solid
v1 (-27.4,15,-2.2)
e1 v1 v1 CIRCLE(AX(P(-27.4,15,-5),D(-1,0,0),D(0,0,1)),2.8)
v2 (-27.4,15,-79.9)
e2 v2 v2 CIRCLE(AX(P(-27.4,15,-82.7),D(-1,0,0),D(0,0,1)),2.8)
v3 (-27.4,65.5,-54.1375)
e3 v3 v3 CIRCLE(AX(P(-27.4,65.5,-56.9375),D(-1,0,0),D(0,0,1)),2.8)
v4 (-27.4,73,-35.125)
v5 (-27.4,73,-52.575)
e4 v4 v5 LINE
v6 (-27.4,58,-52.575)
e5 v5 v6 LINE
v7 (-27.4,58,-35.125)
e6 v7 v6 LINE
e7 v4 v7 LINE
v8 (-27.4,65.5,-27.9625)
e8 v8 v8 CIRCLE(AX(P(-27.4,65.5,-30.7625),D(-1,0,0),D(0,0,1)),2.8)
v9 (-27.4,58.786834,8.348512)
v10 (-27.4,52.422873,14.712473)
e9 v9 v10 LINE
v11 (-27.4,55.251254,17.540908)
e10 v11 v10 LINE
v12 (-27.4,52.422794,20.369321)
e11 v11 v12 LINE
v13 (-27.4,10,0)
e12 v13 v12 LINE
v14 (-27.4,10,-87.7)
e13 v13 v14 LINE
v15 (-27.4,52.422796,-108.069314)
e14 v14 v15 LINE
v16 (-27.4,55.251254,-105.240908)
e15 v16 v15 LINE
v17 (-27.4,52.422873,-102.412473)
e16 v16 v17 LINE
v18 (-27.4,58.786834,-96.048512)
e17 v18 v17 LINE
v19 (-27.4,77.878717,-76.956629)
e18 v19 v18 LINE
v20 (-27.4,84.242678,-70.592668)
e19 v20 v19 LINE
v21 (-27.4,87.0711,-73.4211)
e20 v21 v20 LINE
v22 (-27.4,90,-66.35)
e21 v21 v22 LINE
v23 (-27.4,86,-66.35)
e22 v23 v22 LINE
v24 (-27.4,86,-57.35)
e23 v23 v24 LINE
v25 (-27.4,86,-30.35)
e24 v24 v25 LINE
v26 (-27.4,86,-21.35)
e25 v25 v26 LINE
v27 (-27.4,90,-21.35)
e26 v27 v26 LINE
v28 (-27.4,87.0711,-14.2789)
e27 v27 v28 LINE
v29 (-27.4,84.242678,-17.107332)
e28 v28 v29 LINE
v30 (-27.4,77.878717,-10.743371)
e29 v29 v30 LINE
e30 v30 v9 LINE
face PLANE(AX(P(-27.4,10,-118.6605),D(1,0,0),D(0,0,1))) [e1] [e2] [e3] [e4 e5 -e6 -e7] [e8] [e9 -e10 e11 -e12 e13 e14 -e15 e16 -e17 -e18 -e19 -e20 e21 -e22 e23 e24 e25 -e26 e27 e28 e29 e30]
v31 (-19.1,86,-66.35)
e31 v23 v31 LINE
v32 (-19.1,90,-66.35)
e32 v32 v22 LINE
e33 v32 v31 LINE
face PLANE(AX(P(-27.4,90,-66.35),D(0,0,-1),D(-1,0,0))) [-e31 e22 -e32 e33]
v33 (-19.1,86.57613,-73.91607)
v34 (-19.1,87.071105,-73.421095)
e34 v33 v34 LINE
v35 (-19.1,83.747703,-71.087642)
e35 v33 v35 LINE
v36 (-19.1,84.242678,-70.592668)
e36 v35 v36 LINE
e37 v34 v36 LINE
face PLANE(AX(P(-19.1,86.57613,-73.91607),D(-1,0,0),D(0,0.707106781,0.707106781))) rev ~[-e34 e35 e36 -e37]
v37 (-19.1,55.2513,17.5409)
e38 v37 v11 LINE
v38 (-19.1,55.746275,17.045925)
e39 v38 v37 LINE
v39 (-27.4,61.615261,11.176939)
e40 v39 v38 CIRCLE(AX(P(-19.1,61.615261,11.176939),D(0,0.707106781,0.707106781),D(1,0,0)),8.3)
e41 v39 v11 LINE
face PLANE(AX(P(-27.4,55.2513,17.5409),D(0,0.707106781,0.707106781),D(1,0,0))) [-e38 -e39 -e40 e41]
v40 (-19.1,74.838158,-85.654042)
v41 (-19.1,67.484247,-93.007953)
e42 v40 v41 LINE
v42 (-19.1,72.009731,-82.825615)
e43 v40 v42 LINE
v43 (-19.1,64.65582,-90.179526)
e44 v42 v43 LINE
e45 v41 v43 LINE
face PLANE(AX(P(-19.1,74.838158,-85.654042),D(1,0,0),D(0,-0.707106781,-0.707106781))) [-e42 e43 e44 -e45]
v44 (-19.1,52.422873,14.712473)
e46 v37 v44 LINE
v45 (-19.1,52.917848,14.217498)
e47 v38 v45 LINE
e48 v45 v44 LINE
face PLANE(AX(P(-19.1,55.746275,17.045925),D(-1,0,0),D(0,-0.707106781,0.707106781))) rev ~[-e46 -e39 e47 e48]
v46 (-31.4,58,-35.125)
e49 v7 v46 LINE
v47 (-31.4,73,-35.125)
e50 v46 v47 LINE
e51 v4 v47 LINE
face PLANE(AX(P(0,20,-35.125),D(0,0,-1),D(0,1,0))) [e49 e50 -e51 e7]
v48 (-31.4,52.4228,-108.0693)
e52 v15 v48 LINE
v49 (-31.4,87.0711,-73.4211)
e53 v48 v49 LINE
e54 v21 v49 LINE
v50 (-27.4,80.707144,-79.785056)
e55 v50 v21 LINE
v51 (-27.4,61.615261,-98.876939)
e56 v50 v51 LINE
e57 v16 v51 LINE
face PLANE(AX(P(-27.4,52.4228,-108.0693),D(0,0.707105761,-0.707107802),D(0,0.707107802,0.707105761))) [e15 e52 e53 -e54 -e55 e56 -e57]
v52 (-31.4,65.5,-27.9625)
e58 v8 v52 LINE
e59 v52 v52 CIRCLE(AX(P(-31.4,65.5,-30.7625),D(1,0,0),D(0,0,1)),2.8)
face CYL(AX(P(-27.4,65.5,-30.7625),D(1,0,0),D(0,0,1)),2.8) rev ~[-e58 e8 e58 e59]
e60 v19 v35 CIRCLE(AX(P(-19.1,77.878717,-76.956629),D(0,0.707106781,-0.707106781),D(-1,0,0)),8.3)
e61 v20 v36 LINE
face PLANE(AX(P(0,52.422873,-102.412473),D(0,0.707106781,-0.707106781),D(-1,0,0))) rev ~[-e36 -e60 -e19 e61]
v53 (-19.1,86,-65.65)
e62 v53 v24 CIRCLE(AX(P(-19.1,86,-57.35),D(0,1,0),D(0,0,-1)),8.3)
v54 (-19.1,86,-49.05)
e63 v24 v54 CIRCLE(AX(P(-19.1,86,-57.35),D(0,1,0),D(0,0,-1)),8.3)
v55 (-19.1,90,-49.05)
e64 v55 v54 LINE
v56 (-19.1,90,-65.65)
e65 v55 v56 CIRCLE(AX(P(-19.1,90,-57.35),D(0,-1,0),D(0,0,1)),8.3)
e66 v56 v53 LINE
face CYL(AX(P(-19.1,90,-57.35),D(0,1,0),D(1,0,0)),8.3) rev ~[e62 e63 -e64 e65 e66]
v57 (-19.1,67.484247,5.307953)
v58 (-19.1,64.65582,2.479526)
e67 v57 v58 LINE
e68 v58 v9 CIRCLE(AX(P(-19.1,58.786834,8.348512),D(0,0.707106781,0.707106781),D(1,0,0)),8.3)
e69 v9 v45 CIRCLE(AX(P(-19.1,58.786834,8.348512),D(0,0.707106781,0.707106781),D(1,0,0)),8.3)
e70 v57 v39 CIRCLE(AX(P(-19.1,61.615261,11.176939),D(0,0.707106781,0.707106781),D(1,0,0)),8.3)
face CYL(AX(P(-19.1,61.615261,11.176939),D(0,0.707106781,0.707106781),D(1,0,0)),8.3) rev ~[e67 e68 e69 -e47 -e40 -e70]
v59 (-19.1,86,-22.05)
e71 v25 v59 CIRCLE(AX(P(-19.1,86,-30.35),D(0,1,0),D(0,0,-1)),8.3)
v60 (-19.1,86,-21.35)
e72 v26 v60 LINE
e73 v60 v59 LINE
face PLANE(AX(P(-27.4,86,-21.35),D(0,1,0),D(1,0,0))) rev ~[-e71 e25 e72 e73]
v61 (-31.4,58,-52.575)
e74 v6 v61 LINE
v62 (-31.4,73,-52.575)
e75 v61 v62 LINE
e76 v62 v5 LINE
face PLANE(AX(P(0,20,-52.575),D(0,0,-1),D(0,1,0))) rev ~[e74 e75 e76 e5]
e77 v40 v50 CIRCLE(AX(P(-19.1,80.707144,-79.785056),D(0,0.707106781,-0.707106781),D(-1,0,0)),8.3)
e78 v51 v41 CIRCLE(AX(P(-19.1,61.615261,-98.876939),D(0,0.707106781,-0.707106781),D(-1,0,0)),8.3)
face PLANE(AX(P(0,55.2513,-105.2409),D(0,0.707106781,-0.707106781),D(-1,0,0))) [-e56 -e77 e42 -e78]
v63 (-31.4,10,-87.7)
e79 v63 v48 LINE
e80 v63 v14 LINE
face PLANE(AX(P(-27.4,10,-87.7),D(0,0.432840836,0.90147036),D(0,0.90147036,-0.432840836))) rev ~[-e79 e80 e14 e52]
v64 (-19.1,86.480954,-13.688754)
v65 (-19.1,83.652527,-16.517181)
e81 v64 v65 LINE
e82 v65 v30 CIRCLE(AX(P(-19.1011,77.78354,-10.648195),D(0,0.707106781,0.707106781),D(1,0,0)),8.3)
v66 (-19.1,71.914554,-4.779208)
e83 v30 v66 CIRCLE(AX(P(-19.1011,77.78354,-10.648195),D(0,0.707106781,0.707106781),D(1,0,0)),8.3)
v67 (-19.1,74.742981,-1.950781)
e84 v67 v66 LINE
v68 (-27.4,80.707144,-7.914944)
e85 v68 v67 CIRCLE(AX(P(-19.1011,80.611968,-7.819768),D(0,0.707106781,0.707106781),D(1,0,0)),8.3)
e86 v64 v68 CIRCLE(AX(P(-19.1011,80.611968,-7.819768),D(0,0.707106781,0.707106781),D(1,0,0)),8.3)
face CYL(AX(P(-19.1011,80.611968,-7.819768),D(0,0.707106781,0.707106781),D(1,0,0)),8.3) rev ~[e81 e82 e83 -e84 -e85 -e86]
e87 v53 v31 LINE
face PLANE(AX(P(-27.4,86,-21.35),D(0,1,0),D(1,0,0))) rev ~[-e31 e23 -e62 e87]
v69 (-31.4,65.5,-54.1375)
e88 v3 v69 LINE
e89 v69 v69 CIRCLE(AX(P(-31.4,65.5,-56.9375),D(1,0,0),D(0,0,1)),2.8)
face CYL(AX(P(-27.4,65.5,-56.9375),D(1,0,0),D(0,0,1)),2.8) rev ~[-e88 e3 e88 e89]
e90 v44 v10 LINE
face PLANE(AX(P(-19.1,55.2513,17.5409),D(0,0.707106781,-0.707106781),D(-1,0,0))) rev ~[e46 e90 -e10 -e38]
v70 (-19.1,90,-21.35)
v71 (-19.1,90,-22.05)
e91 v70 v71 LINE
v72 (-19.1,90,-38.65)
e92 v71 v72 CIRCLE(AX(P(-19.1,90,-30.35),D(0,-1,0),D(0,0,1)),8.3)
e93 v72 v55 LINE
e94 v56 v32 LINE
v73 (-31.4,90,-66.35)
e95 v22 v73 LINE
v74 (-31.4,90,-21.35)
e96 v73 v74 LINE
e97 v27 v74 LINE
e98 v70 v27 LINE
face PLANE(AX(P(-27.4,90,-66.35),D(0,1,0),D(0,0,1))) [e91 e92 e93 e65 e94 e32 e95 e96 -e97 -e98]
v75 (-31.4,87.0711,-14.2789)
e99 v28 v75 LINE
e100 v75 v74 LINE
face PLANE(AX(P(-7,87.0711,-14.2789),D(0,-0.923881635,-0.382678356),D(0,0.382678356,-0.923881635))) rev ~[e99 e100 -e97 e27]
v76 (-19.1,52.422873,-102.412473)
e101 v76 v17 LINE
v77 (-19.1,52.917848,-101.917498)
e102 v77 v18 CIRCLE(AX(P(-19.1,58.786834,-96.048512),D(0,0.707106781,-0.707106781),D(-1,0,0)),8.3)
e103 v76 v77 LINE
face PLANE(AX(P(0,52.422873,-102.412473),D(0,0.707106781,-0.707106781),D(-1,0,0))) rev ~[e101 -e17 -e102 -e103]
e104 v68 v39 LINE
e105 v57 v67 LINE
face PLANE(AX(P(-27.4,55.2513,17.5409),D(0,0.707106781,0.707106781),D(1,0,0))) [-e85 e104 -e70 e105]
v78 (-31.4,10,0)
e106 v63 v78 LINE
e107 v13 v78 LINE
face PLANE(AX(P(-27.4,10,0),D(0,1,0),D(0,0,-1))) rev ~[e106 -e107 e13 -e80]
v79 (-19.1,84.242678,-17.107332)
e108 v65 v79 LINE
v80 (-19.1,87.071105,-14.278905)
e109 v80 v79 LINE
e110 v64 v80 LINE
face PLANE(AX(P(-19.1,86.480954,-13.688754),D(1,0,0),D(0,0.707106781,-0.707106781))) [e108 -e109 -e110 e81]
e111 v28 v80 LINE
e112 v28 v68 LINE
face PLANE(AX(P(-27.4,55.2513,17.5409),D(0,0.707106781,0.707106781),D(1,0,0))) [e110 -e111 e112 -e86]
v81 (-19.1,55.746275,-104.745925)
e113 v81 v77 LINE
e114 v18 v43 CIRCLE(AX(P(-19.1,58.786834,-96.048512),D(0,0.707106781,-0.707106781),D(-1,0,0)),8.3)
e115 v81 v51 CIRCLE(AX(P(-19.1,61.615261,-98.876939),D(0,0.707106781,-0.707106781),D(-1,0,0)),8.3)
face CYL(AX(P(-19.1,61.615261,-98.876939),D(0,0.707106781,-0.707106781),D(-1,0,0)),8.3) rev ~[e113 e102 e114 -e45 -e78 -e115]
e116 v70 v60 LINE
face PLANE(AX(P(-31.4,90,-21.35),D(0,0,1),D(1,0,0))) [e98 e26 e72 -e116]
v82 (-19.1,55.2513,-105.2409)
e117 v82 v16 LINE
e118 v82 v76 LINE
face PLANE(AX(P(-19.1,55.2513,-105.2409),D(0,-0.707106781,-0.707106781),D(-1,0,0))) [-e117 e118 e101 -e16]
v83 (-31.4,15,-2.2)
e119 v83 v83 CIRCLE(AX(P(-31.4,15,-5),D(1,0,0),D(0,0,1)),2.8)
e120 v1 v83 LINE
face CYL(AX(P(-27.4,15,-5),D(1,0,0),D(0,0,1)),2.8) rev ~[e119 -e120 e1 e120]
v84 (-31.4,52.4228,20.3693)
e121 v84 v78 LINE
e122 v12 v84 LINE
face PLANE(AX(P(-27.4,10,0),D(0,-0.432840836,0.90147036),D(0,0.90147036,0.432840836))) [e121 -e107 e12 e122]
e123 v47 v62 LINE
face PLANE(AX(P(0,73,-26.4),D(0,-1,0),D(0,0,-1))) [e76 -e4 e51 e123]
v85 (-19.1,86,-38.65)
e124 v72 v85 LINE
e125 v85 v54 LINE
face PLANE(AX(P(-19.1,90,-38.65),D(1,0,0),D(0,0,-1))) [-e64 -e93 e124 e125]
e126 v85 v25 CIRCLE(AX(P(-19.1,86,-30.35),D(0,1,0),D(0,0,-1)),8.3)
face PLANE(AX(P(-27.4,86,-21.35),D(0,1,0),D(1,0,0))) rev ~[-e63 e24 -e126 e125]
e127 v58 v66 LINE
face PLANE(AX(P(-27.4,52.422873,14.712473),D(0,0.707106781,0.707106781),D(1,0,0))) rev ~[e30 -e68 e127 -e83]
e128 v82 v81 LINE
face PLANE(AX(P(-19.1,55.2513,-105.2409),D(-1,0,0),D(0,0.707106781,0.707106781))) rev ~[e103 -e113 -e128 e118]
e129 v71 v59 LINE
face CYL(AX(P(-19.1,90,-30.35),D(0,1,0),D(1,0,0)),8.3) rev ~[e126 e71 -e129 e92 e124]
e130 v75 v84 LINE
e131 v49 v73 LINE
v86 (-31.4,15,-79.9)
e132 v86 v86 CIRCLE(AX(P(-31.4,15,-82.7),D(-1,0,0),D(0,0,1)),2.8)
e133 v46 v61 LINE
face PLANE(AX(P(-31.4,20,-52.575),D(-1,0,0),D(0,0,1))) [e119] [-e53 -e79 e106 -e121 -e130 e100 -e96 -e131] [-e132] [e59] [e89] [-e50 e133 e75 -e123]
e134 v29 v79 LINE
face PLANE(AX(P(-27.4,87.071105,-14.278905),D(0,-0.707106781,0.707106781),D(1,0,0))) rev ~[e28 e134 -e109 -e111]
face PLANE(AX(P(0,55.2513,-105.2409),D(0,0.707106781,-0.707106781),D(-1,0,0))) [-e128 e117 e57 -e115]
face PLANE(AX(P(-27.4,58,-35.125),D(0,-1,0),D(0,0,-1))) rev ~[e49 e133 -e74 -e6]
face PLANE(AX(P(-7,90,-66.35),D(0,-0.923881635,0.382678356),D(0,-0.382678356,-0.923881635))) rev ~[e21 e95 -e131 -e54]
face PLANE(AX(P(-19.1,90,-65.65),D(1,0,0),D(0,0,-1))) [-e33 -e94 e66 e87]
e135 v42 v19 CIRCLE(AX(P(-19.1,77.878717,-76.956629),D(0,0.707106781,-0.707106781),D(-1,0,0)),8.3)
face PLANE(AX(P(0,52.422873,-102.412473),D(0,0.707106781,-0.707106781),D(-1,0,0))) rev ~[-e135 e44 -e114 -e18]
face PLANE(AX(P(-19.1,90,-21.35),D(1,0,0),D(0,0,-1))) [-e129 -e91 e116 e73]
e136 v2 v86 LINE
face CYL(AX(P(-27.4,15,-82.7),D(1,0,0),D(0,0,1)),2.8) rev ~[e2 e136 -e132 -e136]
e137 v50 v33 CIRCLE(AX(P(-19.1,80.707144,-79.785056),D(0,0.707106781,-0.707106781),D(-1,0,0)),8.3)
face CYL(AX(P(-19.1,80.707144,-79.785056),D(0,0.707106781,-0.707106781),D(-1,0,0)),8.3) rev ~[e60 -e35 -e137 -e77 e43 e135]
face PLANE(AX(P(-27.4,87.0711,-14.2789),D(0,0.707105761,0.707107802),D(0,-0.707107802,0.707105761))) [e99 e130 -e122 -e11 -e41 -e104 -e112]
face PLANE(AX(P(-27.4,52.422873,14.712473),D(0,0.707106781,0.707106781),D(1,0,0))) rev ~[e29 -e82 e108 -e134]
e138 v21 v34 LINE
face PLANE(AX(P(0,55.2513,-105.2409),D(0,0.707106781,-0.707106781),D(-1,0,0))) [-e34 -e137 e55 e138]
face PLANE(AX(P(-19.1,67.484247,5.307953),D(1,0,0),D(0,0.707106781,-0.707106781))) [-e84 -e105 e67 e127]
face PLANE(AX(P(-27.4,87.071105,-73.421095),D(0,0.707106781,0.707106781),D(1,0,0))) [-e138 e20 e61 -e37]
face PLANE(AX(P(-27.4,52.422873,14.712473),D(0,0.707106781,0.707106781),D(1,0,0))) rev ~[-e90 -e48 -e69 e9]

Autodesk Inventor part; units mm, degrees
ref_plane "YZ Plane" through (0, 0, 0) normal (1, 0, 0) x (0, 1, 0)
ref_plane "XZ Plane" through (0, 0, 0) normal (0, 1, 0) x (-1, 0, 0)
ref_plane "XY Plane" through (0, 0, 0) normal (0, 0, 1) x (1, 0, 0)
sketch "Sketch1" plane through (0, 0, 0) normal (0, 1, 0) x (-1, 0, 0)
  line L0 (0, 0) -> (27.4, 0)
  line L1 (27.4, 0) -> (27.4, -87.7)
  line L2 (27.4, -87.7) -> (0, -87.7)
  line L3 (0, -87.7) -> (0, 0)
  line L4 (13.7, 0) -> (13.7, -13.2)
  line L5 (13.7, -87.7) -> (13.7, -74.5)
  circle A0 centre (13.7, -13.2) radius 2
  circle A1 centre (13.7, -74.5) radius 2
  dimension "d0" = 27.4
  dimension "d1" = 87.7
  dimension "d2" = 13.2
  dimension "d4" = 4
  dimension "d6" = 4
extrude "Extrusion1" add sketch "Sketch1" along normal blind 10
sketch "Sketch2" plane through (0, 0, 0) normal (0, -1, 0) x (1, 0, 0)
  circle A0 centre (-13.7, -13.2) radius 2 projected
  circle A1 centre (-13.7, -13.2) radius 4.5
  circle A2 centre (-13.7, -74.5) radius 2 projected
  circle A3 centre (-13.7, -74.5) radius 4.5
  point P0 (0, 0)
  dimension "d9" = 9
  dimension "d10" = 9
extrude "Extrusion2" cut sketch "Sketch2" against normal blind 3
sketch "Sketch3" plane through (0, 10, 0) normal (0, 1, 0) x (1, 0, 0)
  line L0 (0, 0) -> (0, 87.7) projected
  line L1 (0, 87.7) -> (-27.4, 87.7) projected
  line L2 (0, 0) -> (-27.4, 0)
  line L3 (-27.4, 0) -> (-27.4, 87.7)
  line L4 (-27.4, 87.7) -> (0, 87.7)
  line L5 (0, 87.7) -> (0, 0)
  circle A0 centre (-11.7, 12.5929) radius 0.0901
  circle A1 centre (-13.7, 13.2) radius 2 projected
sketch "Sketch4" plane through (0, 0, 0) normal (0, -1, 0) x (1, 0, 0)
  line L0 (-27.4, -87.7) -> (-27.4, 0) projected
  line L1 (-27.4, -43.85) -> (0, -43.85)
  line L2 (0, 0) -> (0, -87.7) projected
  circle A0 centre (-13.7, -13.2) radius 2 projected
  line L3 (-13.7, -13.2) -> (-13.7, -26.4)
  line L4 (-13.7, -26.4) -> (0, -26.4)
  line L5 (0, -26.4) -> (0, -43.85)
  line L6 (0, -43.85) -> (-13.7, -43.85)
  line L7 (-13.7, -43.85) -> (-13.7, -26.4)
  line L8 (-13.7, -26.4) -> (-27.4, -26.4)
  line L9 (-27.4, -26.4) -> (-27.4, -43.85)
  line L10 (-27.4, -43.85) -> (-13.7, -43.85)
  line L11 (-13.7, -43.85) -> (-13.7, -26.4)
  circle A1 centre (-13.7, -74.5) radius 2 projected
  line L12 (-13.7, -74.5) -> (-13.7, -61.3)
  line L13 (-13.7, -43.85) -> (-13.7, -61.3)
  line L14 (-13.7, -61.3) -> (0, -61.3)
  line L15 (0, -61.3) -> (0, -43.85)
  line L16 (0, -43.85) -> (-13.7, -43.85)
  line L17 (-13.7, -43.85) -> (-13.7, -61.3)
  line L18 (-13.7, -43.85) -> (-27.4, -43.85)
  line L19 (-27.4, -43.85) -> (-27.4, -61.3)
  line L20 (-27.4, -61.3) -> (-13.7, -61.3)
  line L21 (-13.7, -61.3) -> (-13.7, -43.85)
  line L22 (0, -26.4) -> (-27.4, -26.4)
  line L23 (-27.4, -26.4) -> (-27.4, -35.125)
  line L24 (-27.4, -35.125) -> (0, -35.125)
  line L25 (0, -35.125) -> (0, -26.4)
  line L26 (-27.4, -61.3) -> (0, -61.3)
  line L27 (0, -61.3) -> (0, -52.575)
  line L28 (0, -52.575) -> (-27.4, -52.575)
  line L29 (-27.4, -52.575) -> (-27.4, -61.3)
  dimension "d13" = 13.2
  dimension "d14" = 13.2
extrude "Extrusion3" add sketch "Sketch4" along normal blind 60 contours L0 L28 L13 L20 | L13 L28 L2 L14 | L0 L8 L7 L24 | L7 L4 L2 L24
sketch "Sketch5" plane through (0, 0, -87.7) normal (1, 0, 0) x (0, 0, -1)
  line L0 (0, 10) -> (-87.7, 10) projected
  line L1 (-87.7, 10) -> (-87.7, 182)
  line L2 (0, 10) -> (-87.7, 10)
  line L3 (-87.7, 10) -> (-87.7, 182)
  line L4 (-87.7, 182) -> (0, 182)
  line L5 (0, 182) -> (0, 10)
  line L6 (-87.7, 182) -> (0, 182)
  line L7 (0, 182) -> (0, 192)
  line L8 (0, 192) -> (-87.7, 192)
  line L9 (-87.7, 192) -> (-87.7, 182)
  line L10 (-61.3, 0) -> (-61.3, -60) projected
  line L11 (-61.3, -60) -> (-61.3, 192)
  line L12 (-26.4, -60) -> (-35.125, -60) projected
  line L13 (-26.4, -60) -> (-26.4, 192)
  line L14 (-52.575, 0) -> (-52.575, -60) projected
  line L15 (-52.575, -60) -> (-61.3, -60)
  line L16 (-61.3, -60) -> (-61.3, 192)
  line L17 (-61.3, 192) -> (-52.575, 192)
  line L18 (-52.575, 192) -> (-52.575, -60)
  line L19 (-26.4, 182) -> (-35.125, 182)
  line L20 (-35.125, 182) -> (-35.125, 192)
  line L21 (-35.125, 192) -> (-26.4, 192)
  line L22 (-26.4, 192) -> (-26.4, 182)
  line L23 (-61.3, 192) -> (-52.575, 192)
  line L24 (-52.575, 192) -> (-52.575, 252)
  line L25 (-52.575, 252) -> (-61.3, 252)
  line L26 (-61.3, 252) -> (-61.3, 192)
  line L27 (-35.125, 192) -> (-26.4, 192)
  line L28 (-26.4, 192) -> (-26.4, 252)
  line L29 (-26.4, 252) -> (-35.125, 252)
  line L30 (-35.125, 252) -> (-35.125, 192)
  line L31 (-26.4, 10) -> (-35.125, 10)
  line L32 (-35.125, 10) -> (-35.125, 192)
  line L33 (-35.125, 192) -> (-26.4, 192)
  line L34 (-26.4, 192) -> (-26.4, 10)
  point P0 (-87.7, 0)
  point P1 (-52.575, 10)
  point P2 (-52.575, 182)
  point P3 (-35.125, 10)
  point P4 (-26.4, 182)
  point P5 (-61.3, 182)
  point P6 (-61.3, 10)
  dimension "d17" = 172
  dimension "d18" = 10
  dimension "d19" = 8.725
  dimension "d20" = 60
  dimension "d21" = 60
extrude "Extrusion4" add sketch "Sketch5" against normal up to surface (27.4 mm away) contours L0 L32 L4 L13 | L4 L13 L8 L7 | L4 L20 L8 L13 | L0 L11 L4 L18 | L4 L18 L8 L20 | L4 L11 L8 L18 | L4 L9 L8 L11
extrude "Extrusion5" add sketch "Sketch5" against normal up to surface (27.4 mm away) contours L8 L30 L29 L28 | L8 L26 L25 L24
sketch "Sketch6" plane through (0, 0, 0) normal (0, -1, 0) x (1, 0, 0)
  circle A0 centre (-13.7, -13.2) radius 4.5 projected
  circle A1 centre (-13.7, -13.2) radius 2
  circle A2 centre (-13.7, -74.5) radius 2 projected
  circle A3 centre (-13.7, -74.5) radius 2
  point P0 (0, 0)
  dimension "d26" = 4
extrude "Extrusion6" add sketch "Sketch6" against normal through all contours A1 | A2
sketch "Sketch7" plane through (-13.7, 0, -74.5) normal (0, -1, 0) x (1, 0, 0)
  circle A0 centre (0, 61.3) radius 2 projected
  circle A1 centre (0, 61.3) radius 2
  circle A2 centre (0, 0) radius 4.5 projected
  circle A3 centre (0, 0) radius 2
  point P0 (13.7, 74.5)
extrude "Extrusion7" cut sketch "Sketch7" against normal through all contours A0 | A3
sketch "Sketch8" plane through (-27.4, 192, 0) normal (0, 1, 0) x (1, 0, 0)
  circle A0 centre (13.7, 13.2) radius 2 projected
  circle A1 centre (13.7, 13.2) radius 4.5
  circle A2 centre (13.7, 74.5) radius 4.5 projected
  circle A3 centre (13.7, 74.5) radius 4.5
  point P0 (27.4, 0)
  dimension "d31" = 9
  dimension "d32" = 9
extrude "Extrusion8" cut sketch "Sketch8" against normal blind 3
sketch "Sketch9" plane through (0, 0, 0) normal (1, 0, 0) x (0, 0, -1)
  line L0 (26.4, 182) -> (26.4, 10) projected
  line L1 (26.4, 10) -> (61.3, 10)
  line L2 (61.3, 10) -> (61.3, 182)
  line L3 (61.3, 182) -> (26.4, 182)
  line L4 (26.4, 182) -> (26.4, 10)
  point P0 (0, 0)
extrude "Extrusion9" cut sketch "Sketch9" against normal through all
sketch "Sketch10" plane through (0, 0, 0) normal (1, 0, 0) x (0, 0, -1)
  line L0 (-41.6694, 140.0326) -> (109.1096, 140.0326)
  line L1 (109.1096, 140.0326) -> (109.1096, 292.3119)
  line L2 (109.1096, 292.3119) -> (-41.6694, 292.3119)
  line L3 (-41.6694, 292.3119) -> (-41.6694, 140.0326)
  point P0 (0, 0)
extrude "Extrusion10" cut sketch "Sketch10" against normal blind 30
sketch "Sketch11" plane through (0, 10, 0) normal (0, 1, 0) x (1, 0, 0)
  line L0 (0, 61.3) -> (0, 87.7) projected
  line L1 (-27.4, 0) -> (0, 0) projected
  line L2 (0, 87.7) -> (-27.4, 87.7)
  line L3 (-27.4, 87.7) -> (-27.4, 0)
  line L4 (-27.4, 0) -> (0, 0)
  line L5 (0, 0) -> (0, 87.7)
extrude "Extrusion11" add sketch "Sketch11" against normal up to surface (10 mm away)
sketch "Sketch12" plane through (0, 10, 0) normal (0, 1, 0) x (1, 0, 0)
  line L0 (0, 61.3) -> (0, 87.7) projected
  line L1 (-27.4, 0) -> (0, 0) projected
  line L2 (0, 87.7) -> (-27.4, 87.7)
  line L3 (-27.4, 87.7) -> (-27.4, 0)
  line L4 (-27.4, 0) -> (0, 0)
  line L5 (0, 0) -> (0, 87.7)
  line L6 (-27.4, 0) -> (-11.2, 0)
  line L7 (0, 87.7) -> (-27.4, 87.7) projected
  line L8 (-27.4, 87.7) -> (-11.2, 87.7)
  line L9 (-11.2, 87.7) -> (-11.2, 74.5)
  line L10 (-11.2, 0) -> (-11.2, 13.2)
  circle A0 centre (-11.2, 74.5) radius 2
  circle A1 centre (-11.2, 13.2) radius 2
  dimension "d41" = 16.2
  dimension "d42" = 16.2
  dimension "d43" = 13.2
  dimension "d44" = 13.2
  dimension "d45" = 4
  dimension "d46" = 4
extrude "Extrusion12" cut sketch "Sketch12" against normal through all contours A0 | A1
sketch "Sketch13" plane through (0, 0, -87.7) normal (1, 0, 0) x (0, 0, -1)
  line L0 (-87.7, 10) -> (0, 10) projected
  line L1 (0, 10) -> (-87.7, 10)
  line L2 (-26.4, 0) -> (-26.4, -60) projected
  line L3 (-35.125, 0) -> (-35.125, -60) projected
  line L4 (-26.4, -60) -> (-35.125, -60)
  line L5 (-35.125, -60) -> (-35.125, 0)
  line L6 (-35.125, 0) -> (-26.4, 0)
  line L7 (-26.4, 0) -> (-26.4, -60)
  line L8 (-52.575, 0) -> (-52.575, -60) projected
  line L9 (-61.3, 0) -> (-61.3, -60) projected
  line L10 (-52.575, -60) -> (-61.3, -60)
  line L11 (-61.3, -60) -> (-61.3, 0)
  line L12 (-61.3, 0) -> (-52.575, 0)
  line L13 (-52.575, 0) -> (-52.575, -60)
  line L14 (0, 0) -> (-87.7, 0)
  line L15 (-87.7, 0) -> (-87.7, 10)
  line L16 (-87.7, 10) -> (0, 10)
  line L17 (0, 10) -> (0, 0)
  line L18 (-26.4, 20) -> (-26.4, 80)
  line L19 (-35.125, 20) -> (-35.125, 80)
  line L20 (-26.4, 80) -> (-35.125, 80)
  line L21 (-61.3, 20) -> (-61.3, 80)
  line L22 (-52.575, 80) -> (-61.3, 80)
  line L23 (-52.575, 20) -> (-52.575, 80)
  line L24 (0, 20) -> (-87.7, 20)
  line L25 (-87.7, 20) -> (-87.7, 10)
  line L26 (0, 10) -> (0, 20)
extrude "Extrusion13" add sketch "Sketch13" against normal up to surface (27.4 mm away) contours L25 L24 L26 L0 | L21 L22 L23 L24 | L24 L19 L20 L18
sketch "Sketch14" plane through (-27.4, 0, -26.4) normal (-1, 0, 0) x (0, 0, 1)
  line L0 (26.4, 0) -> (26.4, 20) projected
  line L1 (26.4, 10) -> (-64.4539, 10)
  line L2 (-64.4539, 10) -> (-64.4539, -69.7314)
  line L3 (-64.4539, -69.7314) -> (26.4, -69.7314)
  line L4 (26.4, -69.7314) -> (26.4, 10)
extrude "Extrusion14" cut sketch "Sketch14" against normal blind 30
sketch "Sketch15" plane through (0, 20, -61.3) normal (0, 1, 0) x (1, 0, 0)
  line L0 (0, 26.4) -> (0, 0) projected
  line L1 (0, 26.4) -> (0, 13.2)
  line L2 (0, 13.2) -> (-16.2, 13.2)
  line L3 (0, -61.3) -> (0, -48.1)
  line L4 (0, -34.9) -> (0, -61.3) projected
  line L5 (0, -48.1) -> (-16.2, -48.1)
  circle A0 centre (-16.2, 13.2) radius 2
  circle A1 centre (-16.2, -48.1) radius 2
  dimension "d53" = 13.2
  dimension "d54" = 16.2
  dimension "d55" = 13.2
  dimension "d56" = 16.2
  dimension "d57" = 4
  dimension "d58" = 4
extrude "Extrusion15" cut sketch "Sketch15" against normal blind 30
sketch "Sketch17" plane through (0, 20, -61.3) normal (1, 0, 0) x (0, 0, -1)
  line L0 (-61.3, -10) -> (-61.3, 0) projected
  line L1 (-61.3, -10) -> (-61.3, 179.5615)
  line L2 (-26.175, 60) -> (-34.9, 60) projected
  line L3 (0, 60) -> (-8.725, 60) projected
  line L4 (-26.175, 60) -> (-8.725, 60)
  line L5 (-17.45, 60) -> (-39.95, 60)
  line L6 (-17.45, 60) -> (5.05, 60)
  line L7 (0, 0) -> (0, 60) projected
  line L8 (-34.9, 60) -> (-34.9, 0) projected
  line L9 (0, 60) -> (-34.9, 60)
  line L10 (-34.9, 60) -> (-34.9, 53)
  line L11 (-34.9, 53) -> (0, 53)
  line L12 (0, 53) -> (0, 60)
  line L13 (5.05, 60) -> (-12.9933, 60)
  line L14 (-12.9933, 60) -> (-12.9933, 53)
  line L15 (-12.9933, 53) -> (5.05, 53)
  line L16 (5.05, 53) -> (5.05, 60)
  line L17 (-39.95, 60) -> (-34.9, 60)
  line L18 (-34.9, 60) -> (-34.9, 53)
  line L19 (-34.9, 53) -> (-39.95, 53)
  line L20 (-39.95, 53) -> (-39.95, 60)
  point P0 (-61.3, -20)
  dimension "d61" = 22.5
  dimension "d62" = 22.5
  dimension "d63" = 7
extrude "Extrusion16" add sketch "Sketch17" against normal up to surface (27.4 mm away) contours L4 L14 L11 L8 L2 | L4 L3 L7 L11 L14
extrude "Extrusion17" add sketch "Sketch17" against normal up to surface (27.4 mm away) contours L8 L19 L20 L5 | L7 L6 L16 L15
sketch "Sketch18" plane through (-27.4, 10, -87.7) normal (-1, 0, 0) x (0, 0, 1)
  line L0 (21.35, 70) -> (66.35, 70) projected
  line L1 (66.35, 70) -> (98.1698, 38.1802)
  line L2 (66.35, 70) -> (111.35, 70) construction
  line L3 (21.35, 70) -> (-10.4698, 38.1802)
  line L4 (21.35, 70) -> (66.35, 70) construction
  line L5 (21.35, 70) -> (26.2997, 65.0503)
  line L6 (26.2997, 65.0503) -> (-5.5201, 33.2304)
  line L7 (-10.4698, 38.1802) -> (-5.5201, 33.2304)
  line L8 (43.85, 70) -> (43.85, 34.6614)
  line L9 (66.35, 70) -> (98.1698, 38.1802)
  line L10 (66.35, 70) -> (61.4003, 65.0503)
  line L11 (61.4003, 65.0503) -> (93.2201, 33.2304)
  line L12 (98.1698, 38.1802) -> (93.2201, 33.2304)
  line L13 (21.35, 63) -> (21.35, 70) projected
  line L14 (21.35, 70) -> (21.35, 63)
  line L15 (21.35, 63) -> (24.2495, 63)
  line L16 (66.35, 70) -> (66.35, 63) projected
  line L17 (66.35, 70) -> (66.35, 63)
  line L18 (66.35, 63) -> (63.4505, 63)
  point P0 (87.7, -10)
  dimension "d68" = 45
  dimension "d69" = 45
  dimension "d70" = 45
  dimension "d71" = 135
  dimension "d72" = 7
  dimension "d73" = 45
extrude "Extrusion18" add sketch "Sketch18" against normal up to surface (27.4 mm away) contours L1 L12 L11 L18 L16 | L13 L15 L6 L7 L3
sketch "Sketch20" plane through (0, 10, -87.7) normal (0, -1, 0) x (1, 0, 0)
  circle A0 centre (-16.2, 13.2) radius 2 projected
  circle A1 centre (-16.2, 13.2) radius 2
  circle A2 centre (-16.2, 74.5) radius 2 projected
  circle A3 centre (-16.2, 74.5) radius 2
  point P0 (0, 87.7)
extrude "Extrusion19" add sketch "Sketch20" against normal through all
extrude "Extrusion20" cut sketch "Sketch20" against normal through all
sketch "Sketch21" plane through (0, 20, 0) normal (0, 1, 0) x (1, 0, 0)
  circle A0 centre (-16.2, 13.2) radius 2 projected
  circle A1 centre (-16.2, 13.2) radius 5
  circle A2 centre (-16.2, 74.5) radius 2 projected
  circle A3 centre (-16.2, 74.5) radius 5
  point P0 (0, 0)
  dimension "d80" = 10
  dimension "d81" = 10
extrude "Extrusion21" add sketch "Sketch21" along normal blind 80 contours A0 | A1 | A3
sketch "Sketch22" plane through (-16.2, 100, -13.2) normal (0, 1, 0) x (1, 0, 0)
  line L0 (-14.7944, -28.3502) -> (23.9654, -28.3502)
  line L1 (23.9654, -28.3502) -> (23.9654, 88.2133)
  line L2 (23.9654, 88.2133) -> (-14.7944, 88.2133)
  line L3 (-14.7944, 88.2133) -> (-14.7944, -28.3502)
  circle A0 centre (0, 0) radius 5 projected
  circle A1 centre (0, 0) radius 5
  circle A2 centre (0, 61.3) radius 2 projected
  circle A3 centre (0, 61.3) radius 5
  point P0 (16.2, -13.2)
extrude "Extrusion22" cut sketch "Sketch22" against normal blind 80 contours A0 | A3
sketch "Sketch24" plane through (-27.4, 80, -21.35) normal (0, 0.7071068, 0.7071068) x (1, 0, 0)
  line L0 (0, -45) -> (27.4, -45) projected
  line L1 (27.4, 0) -> (0, 0) projected
  line L2 (27.4, -45) -> (0, -45)
  line L3 (0, -45) -> (0, 0)
  line L4 (0, 0) -> (27.4, 0)
  line L5 (27.4, 0) -> (27.4, -45)
  line L6 (0, 0) -> (0, -45)
  line L7 (0, -2.5809) -> (0, -64.5942) projected
  line L8 (0, -22.5) -> (0, -27.5)
  line L9 (0, -27.5) -> (0, -17.5)
  line L10 (0, -27.5) -> (3, -27.5)
  line L11 (3, -27.5) -> (3, -17.5)
  line L12 (3, -17.5) -> (0, -17.5)
  line L13 (0, -17.5) -> (0, -27.5)
  line L14 (0, -17.5) -> (3, -17.5)
  line L15 (3, -17.5) -> (3, -27.5)
  line L16 (3, -27.5) -> (0, -27.5)
  line L17 (0, -27.5) -> (0, -17.5)
  point P0 (27.4, -71.6653)
  dimension "d86" = 5
  dimension "d87" = 10
  dimension "d88" = 3
extrude "Extrusion23" cut sketch "Sketch24" against normal up to surface (7 mm away) contours L3 L12 L11 L10
sketch "Sketch25" plane through (0, 80, -21.35) normal (0, 1, 0) x (1, 0, 0)
  line L0 (-27.4, 13.775) -> (-27.4, 31.225) projected
  line L1 (-27.4, 22.5) -> (-24.4, 22.5)
  line L2 (-24.4, 22.5) -> (-24.4, 17.5)
  line L3 (-24.4, 17.5) -> (-27.4, 17.5)
  line L4 (-27.4, 17.5) -> (-27.4, 22.5)
  line L5 (-27.4, 17.5) -> (-24.4, 17.5)
  line L6 (-24.4, 17.5) -> (-24.4, 27.5)
  line L7 (-24.4, 27.5) -> (-27.4, 27.5)
  line L8 (-27.4, 27.5) -> (-27.4, 17.5)
  point P0 (0, -21.35)
  point P1 (-24.4, 22.5)
  point P2 (-27.4, 27.5)
  dimension "d91" = 3
  dimension "d92" = 5
  dimension "d93" = 10
extrude "Extrusion24" cut sketch "Sketch25" against normal blind 10
sketch "Sketch26" plane through (0, 48.1802, -98.1698) normal (0, 0.7071068, -0.7071068) x (-1, 0, 0)
  line L0 (0, 45) -> (27.4, 45) projected
  line L1 (27.4, 45) -> (27.4, 0)
  line L2 (27.4, -19.5942) -> (27.4, 42.4191) projected
  line L3 (0, 42.4191) -> (0, -19.5942) projected
  line L4 (27.4, 45) -> (0, 45)
  line L5 (0, 45) -> (0, 0)
  line L6 (0, 0) -> (27.4, 0)
  line L7 (27.4, 0) -> (27.4, 45)
  line L8 (27.4, 45) -> (27.4, 27.5)
  line L9 (27.4, 24.653) -> (27.4, 62.1297) projected
  line L10 (27.4, 27.5) -> (24.4, 27.5)
  line L11 (24.4, 27.5) -> (24.4, 17.5)
  line L12 (24.4, 17.5) -> (27.4, 17.5)
  line L13 (27.4, 17.5) -> (27.4, 27.5)
  point P0 (0, 35.348)
  dimension "d96" = 45
  dimension "d97" = 17.5
  dimension "d98" = 3
  dimension "d99" = 10
extrude "Extrusion25" cut sketch "Sketch26" against normal blind 10 contours L1 L12 L11 L10
sketch "Sketch27" plane through (-27.4, 48.1802, 10.4698) normal (0, 0.7071068, 0.7071068) x (1, 0, 0)
  line L0 (0, 0) -> (27.4, 0) projected
  line L1 (27.4, 45) -> (0, 45) projected
  line L2 (27.4, 0) -> (20.4, 0)
  line L3 (20.4, 0) -> (20.4, 45)
  line L4 (20.4, 45) -> (27.4, 45)
  line L5 (27.4, 45) -> (27.4, 0)
  point P0 (27.4, -26.6653)
  dimension "d102" = 7
extrude "Extrusion26" add sketch "Sketch27" along normal blind 10
sketch "Sketch28" plane through (-27.4, 80, -66.35) normal (0, 1, 0) x (1, 0, 0)
  line L0 (27.4, -45) -> (20.4, -45) projected
  line L1 (27.4, 0) -> (27.4, -45) projected
  line L2 (20.4, -45) -> (27.4, -45)
  line L3 (27.4, -45) -> (27.4, 0)
  line L4 (27.4, 0) -> (20.4, 0)
  line L5 (20.4, 0) -> (20.4, -45)
  point P0 (27.4, -66.35)
extrude "Extrusion27" add sketch "Sketch28" along normal blind 10
sketch "Sketch29" plane through (0, 48.1802, -98.1698) normal (0, 0.7071068, -0.7071068) x (-1, 0, 0)
  line L0 (0, 45) -> (7, 45) projected
  line L1 (7, 45) -> (0, 45)
  line L2 (0, 45) -> (0, 0)
  line L3 (0, 0) -> (7, 0)
  line L4 (7, 0) -> (7, 45)
  point P0 (0, 35.348)
extrude "Extrusion28" add sketch "Sketch29" along normal blind 10
sketch "Sketch30" plane through (-7, 55.2513, 17.5409) normal (-1, 0, 0) x (0, 0.7071068, 0.7071068)
  line L0 (-10, 45) -> (0, 45) projected
  line L1 (-5, 45) -> (-6.4645, 48.5355)
  line L2 (-10, 45) -> (-2.9289, 52.0711) projected
  line L3 (0, 45) -> (-2.9289, 52.0711)
  line L4 (-2.9289, 52.0711) -> (-34.7487, 83.8909) projected
  line L5 (-34.7487, 83.8909) -> (-41.8198, 76.8198)
  line L6 (-41.8198, 76.8198) -> (-41.8198, 86.8198)
  line L7 (-41.8198, 86.8198) -> (-34.7487, 83.8909)
  point P0 (-51.4718, -26.6653)
extrude "Extrusion29" add sketch "Sketch30" against normal up to surface (7 mm away)
sketch "Sketch31" plane through (-7, 80, -66.35) normal (-1, 0, 0) x (0, 0, 1)
  line L0 (52.0711, 7.0711) -> (83.8909, -24.7487) projected
  line L1 (57.3744, -12.3744) -> (45, 0) projected
  line L2 (52.0711, 7.0711) -> (45, 0)
  line L3 (52.0711, 7.0711) -> (45, 10) projected
  line L4 (45, 0) -> (45, 10)
  line L5 (45, 10) -> (52.0711, 7.0711)
  line L6 (0, 10) -> (-7.0711, 7.0711) projected
  line L7 (-7.0711, 7.0711) -> (0, 10)
  line L8 (0, 0) -> (-12.3744, -12.3744) projected
  line L9 (0, 10) -> (0, 0)
  line L10 (0, 0) -> (-7.0711, 7.0711)
  point P0 (66.35, -80)
extrude "Extrusion30" add sketch "Sketch31" along normal up to surface (20.4 mm away)
sketch "Sketch32" plane through (-27.4, 43.2304, 5.5201) normal (0, -0.7071068, 0.7071068) x (1, 0, 0)
  line L0 (27.4, 0) -> (0, 0) projected
  line L1 (27.4, 17) -> (20.4, 17) projected
  line L2 (0, 0) -> (27.4, 0)
  line L3 (27.4, 0) -> (27.4, 17)
  line L4 (27.4, 17) -> (0, 17)
  line L5 (0, 17) -> (0, 0)
  point P0 (27.4, -34.4718)
  point P1 (20.4, 17)
extrude "Extrusion31" add sketch "Sketch32" along normal blind 4
sketch "Sketch33" plane through (0, 43.2304, -93.2201) normal (0, -0.7071068, -0.7071068) x (-1, 0, 0)
  line L0 (0, 14.0711) -> (0, 17) projected
  line L1 (27.4, 7) -> (27.4, -5.3744) projected
  line L2 (0, 17) -> (27.4, 17)
  line L3 (27.4, 17) -> (27.4, 0)
  line L4 (27.4, 0) -> (0, 0)
  line L5 (0, 0) -> (0, 17)
  point P0 (0, -96.4851)
  point P1 (0, 14.0711)
  dimension "d115" = 17
extrude "Extrusion32" add sketch "Sketch33" along normal blind 4
sketch "Sketch34" plane through (-27.4, 10, -87.7) normal (-1, 0, 0) x (0, 0, 1)
  line L0 (87.7, 0) -> (87.7, 10) projected
  line L1 (73.4211, 77.0711) -> (108.0693, 42.4228) projected
  line L2 (87.7, 0) -> (108.0693, 42.4228)
  line L3 (0, 0) -> (0, 10) projected
  line L4 (-17.5409, 45.2513) -> (-20.3693, 42.4228) projected
  line L5 (0, 0) -> (-20.3693, 42.4228)
  line L6 (108.0693, 42.4228) -> (73.4211, 77.0711)
  line L7 (73.4211, 77.0711) -> (66.35, 80) projected
  line L8 (73.4211, 77.0711) -> (66.35, 80)
  line L9 (66.35, 80) -> (21.35, 80) projected
  line L10 (66.35, 80) -> (21.35, 80)
  line L11 (21.35, 80) -> (14.2789, 77.0711) projected
  line L12 (21.35, 80) -> (14.2789, 77.0711)
  line L13 (14.2789, 77.0711) -> (-20.3693, 42.4228)
  line L14 (108.0693, 42.4228) -> (96.0485, 30.402)
  line L15 (61.3, 10) -> (87.7, 10) projected
  line L16 (108.0693, 42.4228) -> (153.9221, 42.4228) construction
  line L17 (63.4505, 63) -> (96.0485, 30.402) projected
  line L18 (65.0399, 10) -> (75.6465, 10)
  line L19 (-20.3693, 42.4228) -> (12.0535, 10)
  line L20 (-20.3693, 42.4228) -> (25.4835, 42.4228) construction
  line L21 (-8.3485, 30.402) -> (-3.0452, 35.7053)
  line L22 (-3.0452, 35.7053) -> (22.6601, 10)
  line L23 (22.6601, 10) -> (12.0535, 10)
  line L24 (96.0485, 30.402) -> (87.7, 10)
  line L25 (87.7, 10) -> (80.2, 10)
  line L26 (80.2, 10) -> (93.788, 43.2062)
  line L27 (96.0485, 30.402) -> (90.7263, 35.7242)
  line L28 (35.125, 10) -> (52.575, 10) projected
  line L29 (43.85, 10) -> (43.85, 63)
  line L30 (48.85, 63) -> (38.85, 63) projected
  line L31 (-8.3485, 30.402) -> (0, 10)
  line L32 (0, 10) -> (7.5, 10)
  line L33 (7.5, 10) -> (-6.088, 43.2062)
  line L34 (-8.3485, 30.402) -> (-3.0263, 35.7242)
  line L35 (94.5362, 31.9143) -> (85.1191, 10)
  line L36 (96.0485, 30.402) -> (94.5362, 31.9143)
  line L37 (80.8457, 45.6048) -> (96.0485, 30.402) projected
  line L38 (26.4, 10) -> (0, 10)
  line L39 (-8.3485, 30.402) -> (0, 10)
  line L40 (-8.3485, 30.402) -> (-3.0263, 35.7242)
  line L41 (-6.8362, 31.9143) -> (2.5809, 10)
  point P0 (87.7, -10)
  point P1 (2.5809, 10)
  point P2 (-4.5571, 26.6106)
  point P3 (94.5362, 31.9143)
  point P4 (85.1191, 10)
  dimension "d121" = 45
  dimension "d122" = 7.5
  dimension "d123" = 7.5
  dimension "d124" = 1
extrude "Extrusion33" add sketch "Sketch34" against normal blind 10 contours L0 L24 L14 L2 | L15 L35 L17 L24 | L5 L19 L31 L3 | L31 L19 L41 L32
sketch "Sketch35" plane through (-27.4, 20, -52.575) normal (-1, 0, 0) x (0, 0, 1)
  line L0 (52.575, 0) -> (52.575, -10) projected
  line L1 (26.175, 0) -> (49.9941, 0) projected
  line L2 (52.575, -10) -> (42.575, -10)
  line L3 (42.575, -10) -> (42.575, 0)
  line L4 (42.575, 0) -> (52.575, 0)
  line L5 (52.575, 0) -> (52.575, -10)
  line L6 (72.9443, 32.4228) -> (52.575, -10) projected
  line L7 (52.575, -10) -> (42.575, 0)
  circle A0 centre (47.575, -5) radius 2.8
  line L8 (52.575, -10) -> (-35.125, -10) projected
  line L9 (8.725, -10) -> (8.725, 0)
  line L10 (0, 0) -> (17.45, 0) projected
  circle A1 centre (-30.125, -5) radius 2.8
  line L11 (17.45, 0) -> (17.45, 53) projected
  line L12 (26.175, 53) -> (26.175, 0) projected
  line L13 (17.45, 53) -> (26.175, 53)
  line L14 (26.175, 53) -> (26.175, 38)
  line L15 (26.175, 38) -> (17.45, 38)
  line L16 (17.45, 38) -> (17.45, 53)
  line L17 (-8.725, 53) -> (-10.8755, 53) projected
  line L18 (26.175, 38) -> (-8.725, 38)
  line L19 (-8.725, 38) -> (-8.725, 53)
  line L20 (-8.725, 53) -> (26.175, 53)
  line L21 (26.175, 53) -> (26.175, 38)
  line L22 (-8.725, 38) -> (0, 38)
  line L23 (0, 38) -> (0, 53)
  line L24 (0, 53) -> (-8.725, 53)
  line L25 (-8.725, 53) -> (-8.725, 38)
  line L26 (26.175, 38) -> (17.45, 53)
  line L27 (3.725, 53) -> (0, 53) projected
  line L28 (0, 53) -> (-8.725, 38)
  circle A2 centre (21.8125, 45.5) radius 2.8
  circle A3 centre (-4.3625, 45.5) radius 2.8
  line L29 (31.225, 60) -> (31.225, 70) projected
  line L30 (38.2961, 67.0711) -> (31.225, 70) projected
  line L31 (31.225, 70) -> (38.2961, 67.0711)
  line L32 (38.2961, 67.0711) -> (72.9443, 32.4228)
  line L33 (72.9443, 32.4228) -> (52.575, -10)
  line L34 (52.575, -10) -> (-35.125, -10)
  line L35 (-35.125, -10) -> (-55.4943, 32.4228) projected
  line L36 (-35.125, -10) -> (-55.4943, 32.4228)
  line L37 (-55.4943, 32.4228) -> (-20.8461, 67.0711)
  line L38 (-20.8461, 67.0711) -> (-13.775, 70)
  line L39 (-13.775, 70) -> (31.225, 70)
  point P0 (52.575, -20)
  point P1 (0, 38)
  dimension "d127" = 10
  dimension "d128" = 5.6
  dimension "d129" = 15
  dimension "d130" = 5.6
  dimension "d131" = 5.6
extrude "Extrusion34" add sketch "Sketch35" along normal blind 4 contours L4 L1 L12 L13 L20 L19 L18 L11 L10 L9 L8 L35 L37 L38 L39 L30 L32 L6 L0 | L0 L7 A0 L1 L4 | L2 L3 L7 A0 | L8 L9 L10 L11 L15 L12 L1 L3 | L26 A2 L13 L12 | L15 L11 L26 A2 | L18 L28 A3 L23 | L19 L20 L28 A3
sketch "Sketch36" plane through (0, 10, -87.7) normal (0, -1, 0) x (1, 0, 0)
  line L0 (0, 0) -> (-17.4, 0) projected
  line L1 (-17.4, 0) -> (-17.4, -25)
  line L2 (-17.4, -8.3485) -> (-17.4, -20.3693) projected
  line L3 (-17.4, -25) -> (-17.4, 119.772)
  line L4 (-17.4, 119.772) -> (7.6601, 119.772)
  line L5 (7.6601, 119.772) -> (7.6601, -47.6838)
  line L6 (7.6601, -47.6838) -> (-17.4, -47.6838)
  line L7 (-17.4, -47.6838) -> (-17.4, 119.772)
  line L8 (-31.4, 87.7) -> (-17.4, 87.7) projected
  line L9 (-31.4, 87.7) -> (-27.4, 87.7)
  line L10 (-27.4, 87.7) -> (4.1783, 87.7)
  line L11 (4.1783, 87.7) -> (4.1783, -30.9605)
  line L12 (4.1783, -30.9605) -> (-27.4, -30.9605)
  line L13 (-27.4, -30.9605) -> (-27.4, 87.7)
  line L14 (-27.4, -30.9605) -> (13.0906, -30.9605)
  line L15 (13.0906, -30.9605) -> (13.0906, 140.084)
  line L16 (13.0906, 140.084) -> (-27.4, 140.084)
  line L17 (-27.4, 140.084) -> (-27.4, -30.9605)
  point P0 (0, 87.7)
  point P1 (-17.4, -30.9605)
  point P2 (7.6601, -30.9605)
  dimension "d134" = 25
  dimension "d135" = 4
extrude "Extrusion35" cut sketch "Sketch36" against normal through all
sketch "Sketch37" plane through (-27.4, 90, -21.35) normal (0, 1, 0) x (1, 0, 0)
  line L0 (-4, 0) -> (-4, 45) projected
  line L1 (-4, 22.5) -> (-4, 0)
  line L2 (-4, 0) -> (-4, 45)
  line L3 (0, 66.35) -> (0, -21.35) projected
  line L4 (-4, 0) -> (0, 0)
  line L5 (0, 0) -> (0, 45)
  line L6 (0, 45) -> (-4, 45)
  line L7 (-4, 45) -> (-4, 0)
  line L8 (0, 45) -> (27.4, 45)
  line L9 (27.4, 45) -> (27.4, 0)
  line L10 (27.4, 0) -> (0, 0)
  line L11 (0, 0) -> (0, 45)
  line L12 (-4, 0) -> (8.3, 0)
  line L13 (0, 0) -> (0, 9)
  line L14 (8.3, 0) -> (8.3, 9)
  line L15 (8.3, 9) -> (-4, 9)
  line L16 (-4, 9) -> (-4, 0)
  line L17 (-4, 0) -> (8.3, 0)
  line L18 (8.3, 0) -> (8.3, 9)
  circle A0 centre (8.3, 9) radius 8.3
  line L19 (8.3, 9) -> (8.3, 45)
  line L20 (8.3, 45) -> (8.3, 36)
  circle A1 centre (8.3, 36) radius 8.3
  line L21 (8.3, 0) -> (0, 0)
  line L22 (0, 0) -> (0, 45)
  line L23 (0, 45) -> (8.3, 45)
  line L24 (8.3, 45) -> (8.3, 0)
  point P0 (27.4, -21.35)
  point P1 (8.3, 0.7)
  point P2 (8.3, 17.3)
  point P3 (8.3, 27.7)
  point P4 (8.3, 44.3)
  dimension "d138" = 22.5
  dimension "d139" = 12.3
  dimension "d140" = 9
  dimension "d141" = 9
  dimension "d142" = 16.6
  dimension "d143" = 9
  dimension "d144" = 16.6
extrude "Extrusion36" add sketch "Sketch37" against normal blind 4 contours L0 L15 L3 L4 | L0 L6 L3 L15 | L3 A0 L14 L10 | L3 A1 L19 A0 | L3 L8 L19 A1
sketch "Sketch39" plane through (-27.4, 55.2513, 17.5409) normal (0, 0.7071068, 0.7071068) x (1, 0, 0)
  line L0 (0, 45) -> (-4, 45) projected
  line L1 (-4, 45) -> (27.4, 45)
  line L2 (27.4, 45) -> (27.4, 0)
  line L3 (27.4, 0) -> (-4, 0)
  line L4 (-4, 0) -> (-4, 45)
  line L5 (0, 42.4191) -> (0, -19.5942) projected
  line L6 (0, 0) -> (0, 9)
  line L7 (0, 9) -> (16.6, 9)
  circle A0 centre (8.3, 9) radius 8.3
  line L8 (0, 45) -> (0, 36)
  line L9 (0, 36) -> (16.5978, 35.7307)
  circle A1 centre (8.2989, 35.8654) radius 8.3
  line L10 (8.3, 9) -> (8.3, 0)
  line L11 (8.3, 0) -> (8.3, 45)
  point P0 (27.4, -26.6653)
  point P1 (8.3, 44.1654)
  point P2 (0, 42.4191)
  point P3 (8.3, 17.3)
  point P4 (8.3, 27.5654)
  point P5 (0, 35.7307)
  point P6 (8.3, 0.7)
  dimension "d161" = 45
  dimension "d162" = 9
  dimension "d163" = 16.6
  dimension "d164" = 9
  dimension "d165" = 16.6
extrude "Extrusion39" add sketch "Sketch39" against normal blind 4 contours L1 L11 A1 L5 L8 | A1 L11 A0 L5 | L5 A0 L10 L3
sketch "Sketch40" plane through (0, 55.2513, -105.2409) normal (0, 0.7071068, -0.7071068) x (-1, 0, 0)
  line L0 (31.4, 45) -> (31.4, -4) projected
  line L1 (31.4, 45) -> (6.6569, 45)
  line L2 (6.6569, 45) -> (6.6569, 0)
  line L3 (6.6569, 0) -> (31.4, 0)
  line L4 (31.4, 0) -> (31.4, 45)
  line L5 (27.4, 45) -> (27.4, -4) projected
  line L6 (27.4, 45) -> (27.4, 36)
  line L7 (27.4, 36) -> (10.8, 36)
  circle A0 centre (19.1, 36) radius 8.3
  line L8 (27.4, 0) -> (10.8, 0)
  line L9 (10.8, 0) -> (10.8, 9)
  line L10 (19.1, 0) -> (19.1, 9)
  circle A1 centre (19.1, 9) radius 8.3
  line L11 (19.1, 36) -> (19.1, 45)
  line L12 (19.1, 45) -> (19.1, 0)
  point P0 (0, 35.348)
  point P1 (19.1, 27.7)
  point P2 (19.1, 17.3)
  point P3 (27.4, 9)
  point P4 (19.1, 44.3)
  point P5 (19.1, 0.7)
  point P6 (19.1, 0)
  dimension "d168" = 45
  dimension "d169" = 9
  dimension "d170" = 16.6
  dimension "d171" = 16.6
  dimension "d172" = 9
  dimension "d173" = 9
extrude "Extrusion40" add sketch "Sketch40" against normal blind 4 contours L5 A0 L11 L1 | L3 L10 A1 L5 | L5 A1 L12 A0
properties part number "Top front deck"
